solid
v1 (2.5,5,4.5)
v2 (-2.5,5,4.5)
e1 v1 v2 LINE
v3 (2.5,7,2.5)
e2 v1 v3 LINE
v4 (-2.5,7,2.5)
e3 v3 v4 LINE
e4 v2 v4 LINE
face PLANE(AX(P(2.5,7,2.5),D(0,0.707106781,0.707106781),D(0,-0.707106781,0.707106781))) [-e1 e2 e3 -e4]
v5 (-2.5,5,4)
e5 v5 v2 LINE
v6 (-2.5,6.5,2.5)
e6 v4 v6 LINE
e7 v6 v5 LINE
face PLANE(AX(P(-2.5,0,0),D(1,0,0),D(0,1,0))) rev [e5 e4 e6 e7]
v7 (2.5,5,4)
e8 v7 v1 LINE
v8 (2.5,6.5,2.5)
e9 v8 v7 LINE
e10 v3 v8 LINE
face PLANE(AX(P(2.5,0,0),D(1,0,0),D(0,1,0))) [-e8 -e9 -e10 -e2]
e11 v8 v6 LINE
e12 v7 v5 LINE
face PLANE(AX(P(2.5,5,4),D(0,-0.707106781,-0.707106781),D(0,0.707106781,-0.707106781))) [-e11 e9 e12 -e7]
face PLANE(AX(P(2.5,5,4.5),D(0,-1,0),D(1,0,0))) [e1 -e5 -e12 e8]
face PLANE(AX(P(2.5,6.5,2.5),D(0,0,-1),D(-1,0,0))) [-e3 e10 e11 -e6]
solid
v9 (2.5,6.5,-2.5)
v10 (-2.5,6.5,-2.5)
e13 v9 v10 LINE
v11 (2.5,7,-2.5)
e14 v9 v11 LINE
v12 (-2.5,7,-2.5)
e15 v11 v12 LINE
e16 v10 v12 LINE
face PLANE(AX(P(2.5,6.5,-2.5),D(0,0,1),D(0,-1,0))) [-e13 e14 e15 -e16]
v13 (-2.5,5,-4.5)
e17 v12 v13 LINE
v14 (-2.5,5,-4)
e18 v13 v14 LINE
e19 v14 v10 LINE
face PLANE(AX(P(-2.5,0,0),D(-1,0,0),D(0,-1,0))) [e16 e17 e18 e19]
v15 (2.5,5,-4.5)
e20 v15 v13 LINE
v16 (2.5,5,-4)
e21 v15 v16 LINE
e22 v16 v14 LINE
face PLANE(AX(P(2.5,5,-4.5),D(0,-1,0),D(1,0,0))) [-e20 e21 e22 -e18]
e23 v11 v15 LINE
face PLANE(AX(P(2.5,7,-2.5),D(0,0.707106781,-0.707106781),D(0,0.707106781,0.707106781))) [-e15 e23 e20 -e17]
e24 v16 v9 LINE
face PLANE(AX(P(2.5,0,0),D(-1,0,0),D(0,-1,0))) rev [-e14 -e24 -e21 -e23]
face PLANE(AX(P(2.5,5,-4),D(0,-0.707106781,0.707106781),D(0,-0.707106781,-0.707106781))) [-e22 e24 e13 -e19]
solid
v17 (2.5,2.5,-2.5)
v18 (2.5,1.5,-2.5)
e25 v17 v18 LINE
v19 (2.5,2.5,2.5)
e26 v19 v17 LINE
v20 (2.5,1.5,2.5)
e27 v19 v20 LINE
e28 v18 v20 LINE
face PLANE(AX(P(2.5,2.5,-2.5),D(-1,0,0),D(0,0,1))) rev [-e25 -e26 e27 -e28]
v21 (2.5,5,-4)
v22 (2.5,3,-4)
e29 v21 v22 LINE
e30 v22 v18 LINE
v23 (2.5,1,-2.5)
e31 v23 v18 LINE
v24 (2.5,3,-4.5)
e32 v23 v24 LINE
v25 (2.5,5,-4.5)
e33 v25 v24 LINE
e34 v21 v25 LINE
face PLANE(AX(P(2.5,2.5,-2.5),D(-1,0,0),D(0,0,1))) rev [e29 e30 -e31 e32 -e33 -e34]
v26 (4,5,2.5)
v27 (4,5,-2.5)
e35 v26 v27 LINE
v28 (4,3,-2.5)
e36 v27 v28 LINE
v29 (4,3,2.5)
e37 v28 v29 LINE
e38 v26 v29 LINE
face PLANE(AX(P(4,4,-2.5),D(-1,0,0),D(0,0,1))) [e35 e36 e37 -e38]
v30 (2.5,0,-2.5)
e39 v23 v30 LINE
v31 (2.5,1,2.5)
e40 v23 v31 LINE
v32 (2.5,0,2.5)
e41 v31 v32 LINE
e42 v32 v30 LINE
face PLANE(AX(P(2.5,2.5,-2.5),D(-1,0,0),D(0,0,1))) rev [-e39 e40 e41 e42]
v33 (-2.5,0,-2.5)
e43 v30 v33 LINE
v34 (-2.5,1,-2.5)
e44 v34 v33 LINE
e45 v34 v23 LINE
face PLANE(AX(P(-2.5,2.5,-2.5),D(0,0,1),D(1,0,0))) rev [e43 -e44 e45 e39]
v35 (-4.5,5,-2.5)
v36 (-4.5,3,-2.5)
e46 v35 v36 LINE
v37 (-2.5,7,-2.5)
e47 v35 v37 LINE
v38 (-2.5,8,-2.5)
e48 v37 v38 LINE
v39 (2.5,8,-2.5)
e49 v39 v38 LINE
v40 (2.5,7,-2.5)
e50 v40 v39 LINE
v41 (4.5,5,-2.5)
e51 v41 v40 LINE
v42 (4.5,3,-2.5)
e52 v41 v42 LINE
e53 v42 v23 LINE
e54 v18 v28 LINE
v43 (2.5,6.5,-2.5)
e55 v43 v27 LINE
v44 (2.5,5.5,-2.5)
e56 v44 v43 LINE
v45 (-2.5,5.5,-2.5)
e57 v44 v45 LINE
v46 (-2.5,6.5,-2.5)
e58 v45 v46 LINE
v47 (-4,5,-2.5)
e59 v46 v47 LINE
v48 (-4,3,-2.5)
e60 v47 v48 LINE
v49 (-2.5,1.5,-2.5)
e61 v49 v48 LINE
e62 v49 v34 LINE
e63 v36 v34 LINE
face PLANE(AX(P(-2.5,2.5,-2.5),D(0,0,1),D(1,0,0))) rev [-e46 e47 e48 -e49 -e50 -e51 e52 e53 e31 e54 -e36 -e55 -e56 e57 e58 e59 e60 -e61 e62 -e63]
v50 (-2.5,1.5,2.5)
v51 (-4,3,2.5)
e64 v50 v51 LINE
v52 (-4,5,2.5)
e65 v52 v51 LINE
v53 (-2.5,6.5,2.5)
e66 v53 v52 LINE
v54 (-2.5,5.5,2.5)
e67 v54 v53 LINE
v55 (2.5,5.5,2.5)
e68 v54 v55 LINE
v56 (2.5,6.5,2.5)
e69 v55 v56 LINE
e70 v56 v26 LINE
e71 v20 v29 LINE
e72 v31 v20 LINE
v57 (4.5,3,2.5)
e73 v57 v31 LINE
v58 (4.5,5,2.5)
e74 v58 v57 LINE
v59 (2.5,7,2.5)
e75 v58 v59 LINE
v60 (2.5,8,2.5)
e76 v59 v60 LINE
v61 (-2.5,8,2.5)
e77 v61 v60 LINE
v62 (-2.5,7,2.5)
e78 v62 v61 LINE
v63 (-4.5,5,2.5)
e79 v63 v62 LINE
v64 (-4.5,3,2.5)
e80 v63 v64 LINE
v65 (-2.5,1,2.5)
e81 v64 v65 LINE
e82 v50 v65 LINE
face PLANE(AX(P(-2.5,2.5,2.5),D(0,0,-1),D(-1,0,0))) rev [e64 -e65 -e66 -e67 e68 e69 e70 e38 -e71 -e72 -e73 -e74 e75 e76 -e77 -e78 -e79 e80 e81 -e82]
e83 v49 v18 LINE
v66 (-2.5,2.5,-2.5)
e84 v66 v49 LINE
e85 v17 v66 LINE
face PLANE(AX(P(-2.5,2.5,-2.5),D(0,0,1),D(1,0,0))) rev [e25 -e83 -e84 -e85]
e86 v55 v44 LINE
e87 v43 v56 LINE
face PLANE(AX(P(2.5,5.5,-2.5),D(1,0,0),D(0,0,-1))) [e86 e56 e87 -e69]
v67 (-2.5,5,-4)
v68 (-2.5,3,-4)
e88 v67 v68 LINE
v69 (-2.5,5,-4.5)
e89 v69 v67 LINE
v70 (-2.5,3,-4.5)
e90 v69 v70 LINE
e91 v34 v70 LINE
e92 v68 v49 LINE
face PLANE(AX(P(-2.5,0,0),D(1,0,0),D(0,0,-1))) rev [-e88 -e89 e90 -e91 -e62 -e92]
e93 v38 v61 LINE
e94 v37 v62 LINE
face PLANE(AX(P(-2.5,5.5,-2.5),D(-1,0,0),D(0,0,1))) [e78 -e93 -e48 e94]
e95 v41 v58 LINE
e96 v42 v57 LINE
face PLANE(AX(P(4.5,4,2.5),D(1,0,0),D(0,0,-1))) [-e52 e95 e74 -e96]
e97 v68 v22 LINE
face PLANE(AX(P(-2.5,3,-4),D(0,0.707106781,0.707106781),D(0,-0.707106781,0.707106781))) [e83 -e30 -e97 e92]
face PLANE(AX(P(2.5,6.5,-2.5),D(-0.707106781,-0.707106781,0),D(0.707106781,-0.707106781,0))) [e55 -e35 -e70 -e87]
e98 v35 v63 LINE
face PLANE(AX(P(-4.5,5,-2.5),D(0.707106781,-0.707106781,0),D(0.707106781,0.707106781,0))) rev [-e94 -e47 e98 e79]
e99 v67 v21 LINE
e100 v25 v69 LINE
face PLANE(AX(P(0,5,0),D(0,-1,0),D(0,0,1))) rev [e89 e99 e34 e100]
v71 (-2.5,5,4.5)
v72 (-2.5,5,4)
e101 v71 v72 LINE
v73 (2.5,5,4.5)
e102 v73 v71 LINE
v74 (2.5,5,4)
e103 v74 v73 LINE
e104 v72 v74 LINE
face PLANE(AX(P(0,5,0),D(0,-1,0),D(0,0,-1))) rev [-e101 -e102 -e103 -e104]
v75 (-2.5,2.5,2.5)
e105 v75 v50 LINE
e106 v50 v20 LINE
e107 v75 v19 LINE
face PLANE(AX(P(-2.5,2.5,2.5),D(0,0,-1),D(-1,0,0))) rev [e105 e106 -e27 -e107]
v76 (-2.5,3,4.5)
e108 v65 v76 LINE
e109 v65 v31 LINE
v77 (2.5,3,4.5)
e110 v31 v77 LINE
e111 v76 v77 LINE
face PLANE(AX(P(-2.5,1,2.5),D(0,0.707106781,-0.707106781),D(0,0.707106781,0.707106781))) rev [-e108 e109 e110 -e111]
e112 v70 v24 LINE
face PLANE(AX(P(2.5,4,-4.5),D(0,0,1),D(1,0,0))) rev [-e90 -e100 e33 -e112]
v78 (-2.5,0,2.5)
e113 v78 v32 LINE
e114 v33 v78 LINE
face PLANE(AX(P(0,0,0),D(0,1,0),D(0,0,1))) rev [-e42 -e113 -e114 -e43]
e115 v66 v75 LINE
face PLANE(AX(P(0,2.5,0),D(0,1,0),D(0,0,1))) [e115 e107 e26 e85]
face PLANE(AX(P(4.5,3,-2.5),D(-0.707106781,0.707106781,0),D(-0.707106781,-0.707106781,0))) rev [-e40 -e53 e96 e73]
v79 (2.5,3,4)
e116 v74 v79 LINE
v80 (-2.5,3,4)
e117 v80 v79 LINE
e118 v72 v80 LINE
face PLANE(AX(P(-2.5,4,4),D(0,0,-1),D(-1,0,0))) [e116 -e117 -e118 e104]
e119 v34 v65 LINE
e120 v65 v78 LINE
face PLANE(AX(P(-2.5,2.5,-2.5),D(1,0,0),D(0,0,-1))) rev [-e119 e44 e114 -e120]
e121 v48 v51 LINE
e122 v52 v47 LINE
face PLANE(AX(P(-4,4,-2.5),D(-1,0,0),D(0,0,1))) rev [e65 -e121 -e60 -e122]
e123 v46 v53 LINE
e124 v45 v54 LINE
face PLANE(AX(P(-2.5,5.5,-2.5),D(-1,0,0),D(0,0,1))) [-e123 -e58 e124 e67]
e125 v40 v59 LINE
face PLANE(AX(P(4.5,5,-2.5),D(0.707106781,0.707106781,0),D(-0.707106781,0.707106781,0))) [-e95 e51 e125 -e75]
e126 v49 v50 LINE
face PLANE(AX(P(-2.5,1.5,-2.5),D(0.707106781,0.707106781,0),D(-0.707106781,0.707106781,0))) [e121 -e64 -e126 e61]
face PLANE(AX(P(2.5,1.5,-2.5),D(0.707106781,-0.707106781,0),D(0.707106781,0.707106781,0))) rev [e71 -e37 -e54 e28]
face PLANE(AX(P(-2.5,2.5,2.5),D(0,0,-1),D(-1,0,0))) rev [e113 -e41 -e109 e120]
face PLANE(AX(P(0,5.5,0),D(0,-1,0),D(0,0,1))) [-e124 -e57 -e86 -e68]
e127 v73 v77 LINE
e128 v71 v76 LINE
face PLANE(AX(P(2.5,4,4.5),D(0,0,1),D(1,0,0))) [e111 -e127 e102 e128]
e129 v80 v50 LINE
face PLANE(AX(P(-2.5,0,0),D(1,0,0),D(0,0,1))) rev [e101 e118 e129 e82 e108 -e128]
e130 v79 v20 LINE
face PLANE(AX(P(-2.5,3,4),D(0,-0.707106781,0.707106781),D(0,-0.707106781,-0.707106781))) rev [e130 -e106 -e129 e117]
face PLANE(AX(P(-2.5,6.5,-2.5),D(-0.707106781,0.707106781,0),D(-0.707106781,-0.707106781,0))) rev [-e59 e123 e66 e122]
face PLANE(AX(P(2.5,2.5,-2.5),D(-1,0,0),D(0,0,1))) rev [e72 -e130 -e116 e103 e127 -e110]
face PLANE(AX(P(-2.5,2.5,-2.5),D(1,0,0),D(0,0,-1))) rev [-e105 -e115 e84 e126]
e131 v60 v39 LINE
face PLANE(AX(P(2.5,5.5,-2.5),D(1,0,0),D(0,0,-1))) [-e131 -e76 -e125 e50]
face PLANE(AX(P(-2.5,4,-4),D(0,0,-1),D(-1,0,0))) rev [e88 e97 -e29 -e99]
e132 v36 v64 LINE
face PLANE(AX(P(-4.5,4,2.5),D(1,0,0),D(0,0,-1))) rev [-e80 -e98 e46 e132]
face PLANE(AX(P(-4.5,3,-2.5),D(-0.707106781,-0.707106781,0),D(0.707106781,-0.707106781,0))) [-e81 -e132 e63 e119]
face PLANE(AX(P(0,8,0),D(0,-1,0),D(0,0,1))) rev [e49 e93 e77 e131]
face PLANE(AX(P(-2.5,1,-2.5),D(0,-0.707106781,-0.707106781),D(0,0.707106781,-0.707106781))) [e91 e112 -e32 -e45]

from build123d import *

# Parameters (mm, degrees)
SKETCH2_W            = 5
SKETCH2_H            = 5
BOSS_EXTRUDE1_DEPTH  = 2.5
BOSS_EXTRUDE2_DEPTH  = 5
BOSS_EXTRUDE3_DEPTH  = 5
SKETCH5_W            = 0.5
SKETCH5_H            = 5
BOSS_EXTRUDE4_DEPTH  = 1
SKETCH6_W            = 5
SKETCH6_H            = 0.5
BOSS_EXTRUDE5_DEPTH  = 1
MIRROR3_START        = -2.5
MIRROR3_OUTLINE_W    = 0.5
MIRROR3_OUTLINE_H    = 1
MIRROR3_DEPTH        = 5
MIRROR5_COPY_1_DEPTH = 5
MIRROR5_COPY_2_DEPTH = 5
MIRROR6_START        = -2.5
MIRROR6_OUTLINE_W    = 1
MIRROR6_OUTLINE_H    = 0.5
MIRROR6_DEPTH        = 5
BOSS_EXTRUDE7_DEPTH  = 5
BOSS_EXTRUDE9_DEPTH  = 5


# Read off the part's stored shape, not the designer's step: Mirror3, Mirror6
with BuildPart() as part:
    # Sketch2 → Boss-Extrude1 (new body)
    with BuildSketch(Plane(origin=(0, 0, 0), x_dir=(1, 0, 0), z_dir=(0, 1, 0))):
        Rectangle(SKETCH2_W, SKETCH2_H)
    boss_extrude1 = extrude(amount=BOSS_EXTRUDE1_DEPTH)

    # Sketch3 → Boss-Extrude2 (add)
    with BuildSketch(Plane.XY.offset(2.5)):
        Polygon((-2.5, 1.5), (-4, 3), (-4.5, 3), (-2.5, 1), align=None)
    boss_extrude2 = extrude(amount=-BOSS_EXTRUDE2_DEPTH)

    # Sketch4 → Boss-Extrude3 (add)
    with BuildSketch(Plane(origin=(2.5, 0, 0), x_dir=(0, 0, -1), z_dir=(1, 0, 0))):
        Polygon((2.5, 1.5), (2.5, 1), (4.5, 3), (4, 3), align=None)
    boss_extrude3 = extrude(amount=-BOSS_EXTRUDE3_DEPTH)

    # Sketch5 → Boss-Extrude4 (add)
    with BuildSketch(Plane(origin=(0, 3, 0), x_dir=(1, 0, 0), z_dir=(0, 1, 0))):
        with Locations((-4.25, 0)):
            Rectangle(SKETCH5_W, SKETCH5_H)
    boss_extrude4 = extrude(amount=BOSS_EXTRUDE4_DEPTH)

    # Sketch6 → Boss-Extrude5 (add)
    with BuildSketch(Plane(origin=(0, 3, 0), x_dir=(1, 0, 0), z_dir=(0, 1, 0))):
        with Locations((0, 4.25)):
            Rectangle(SKETCH6_W, SKETCH6_H)
    boss_extrude5 = extrude(amount=BOSS_EXTRUDE5_DEPTH)

    # Mirror1: Boss-Extrude3, Boss-Extrude5 across plane
    add(boss_extrude3.mirror(Plane.XY))
    add(boss_extrude5.mirror(Plane.XY))

    # Mirror2: Boss-Extrude2, Boss-Extrude4 across plane
    add(boss_extrude2.mirror(Plane(origin=(0, 0, 0), x_dir=(0, 0, 1), z_dir=(1, 0, 0))))
    add(boss_extrude4.mirror(Plane(origin=(0, 0, 0), x_dir=(0, 0, 1), z_dir=(1, 0, 0))))

    # Mirror3 outline → Mirror3 (add)
    with BuildSketch(Plane.XY.offset(MIRROR3_START)):
        with Locations((-4.25, 4.5)):
            Rectangle(MIRROR3_OUTLINE_W, MIRROR3_OUTLINE_H)
        with Locations((4.25, 4.5)):
            Rectangle(MIRROR3_OUTLINE_W, MIRROR3_OUTLINE_H)
    extrude(amount=MIRROR3_DEPTH)

    # Mirror4: Boss-Extrude2 across plane
    add(boss_extrude2.mirror(Plane.ZX.offset(4)))

    # Mirror5 copy 1 sketch → Mirror5 copy 1 (add)
    with BuildSketch(Plane(origin=(0, 8, 2.5), x_dir=(-1, 0, 0), z_dir=(0, 0, 1))):
        Polygon((-2.5, 1.5), (-4, 3), (-4.5, 3), (-2.5, 1), align=None)
    extrude(amount=-MIRROR5_COPY_1_DEPTH)

    # Mirror5 copy 2 sketch → Mirror5 copy 2 (add)
    with BuildSketch(Plane(origin=(0, 0, 2.5), x_dir=(-1, 0, 0), z_dir=(0, 0, 1))):
        Polygon((-2.5, -1.5), (-4, -3), (-4.5, -3), (-2.5, -1), align=None)
    extrude(amount=-MIRROR5_COPY_2_DEPTH)

    # Mirror6 outline → Mirror6 (add)
    with BuildSketch(Plane.YZ.offset(MIRROR6_START)):
        with Locations((4.5, -4.25)):
            Rectangle(MIRROR6_OUTLINE_W, MIRROR6_OUTLINE_H)
        with Locations((4.5, 4.25)):
            Rectangle(MIRROR6_OUTLINE_W, MIRROR6_OUTLINE_H)
    extrude(amount=MIRROR6_DEPTH)

    # Mirror10: Boss-Extrude1 across plane
    add(boss_extrude1.mirror(Plane.ZX.offset(4)))


with BuildPart() as body_2:
    # Sketch7 → Boss-Extrude7 (new body)
    with BuildSketch(Plane.ZY.offset(2.5)):
        Polygon((-4.5, 5), (-4, 5), (-2.5, 6.5), (-2.5, 7), align=None)
    extrude(amount=-BOSS_EXTRUDE7_DEPTH)


with BuildPart() as body_3:
    # Sketch8 → Boss-Extrude9 (new body)
    with BuildSketch(Plane.ZY.offset(2.5)):
        Polygon((4.5, 5), (4, 5), (2.5, 6.5), (2.5, 7), align=None)
    extrude(amount=-BOSS_EXTRUDE9_DEPTH)


solid = Compound([part.part, body_2.part, body_3.part])
